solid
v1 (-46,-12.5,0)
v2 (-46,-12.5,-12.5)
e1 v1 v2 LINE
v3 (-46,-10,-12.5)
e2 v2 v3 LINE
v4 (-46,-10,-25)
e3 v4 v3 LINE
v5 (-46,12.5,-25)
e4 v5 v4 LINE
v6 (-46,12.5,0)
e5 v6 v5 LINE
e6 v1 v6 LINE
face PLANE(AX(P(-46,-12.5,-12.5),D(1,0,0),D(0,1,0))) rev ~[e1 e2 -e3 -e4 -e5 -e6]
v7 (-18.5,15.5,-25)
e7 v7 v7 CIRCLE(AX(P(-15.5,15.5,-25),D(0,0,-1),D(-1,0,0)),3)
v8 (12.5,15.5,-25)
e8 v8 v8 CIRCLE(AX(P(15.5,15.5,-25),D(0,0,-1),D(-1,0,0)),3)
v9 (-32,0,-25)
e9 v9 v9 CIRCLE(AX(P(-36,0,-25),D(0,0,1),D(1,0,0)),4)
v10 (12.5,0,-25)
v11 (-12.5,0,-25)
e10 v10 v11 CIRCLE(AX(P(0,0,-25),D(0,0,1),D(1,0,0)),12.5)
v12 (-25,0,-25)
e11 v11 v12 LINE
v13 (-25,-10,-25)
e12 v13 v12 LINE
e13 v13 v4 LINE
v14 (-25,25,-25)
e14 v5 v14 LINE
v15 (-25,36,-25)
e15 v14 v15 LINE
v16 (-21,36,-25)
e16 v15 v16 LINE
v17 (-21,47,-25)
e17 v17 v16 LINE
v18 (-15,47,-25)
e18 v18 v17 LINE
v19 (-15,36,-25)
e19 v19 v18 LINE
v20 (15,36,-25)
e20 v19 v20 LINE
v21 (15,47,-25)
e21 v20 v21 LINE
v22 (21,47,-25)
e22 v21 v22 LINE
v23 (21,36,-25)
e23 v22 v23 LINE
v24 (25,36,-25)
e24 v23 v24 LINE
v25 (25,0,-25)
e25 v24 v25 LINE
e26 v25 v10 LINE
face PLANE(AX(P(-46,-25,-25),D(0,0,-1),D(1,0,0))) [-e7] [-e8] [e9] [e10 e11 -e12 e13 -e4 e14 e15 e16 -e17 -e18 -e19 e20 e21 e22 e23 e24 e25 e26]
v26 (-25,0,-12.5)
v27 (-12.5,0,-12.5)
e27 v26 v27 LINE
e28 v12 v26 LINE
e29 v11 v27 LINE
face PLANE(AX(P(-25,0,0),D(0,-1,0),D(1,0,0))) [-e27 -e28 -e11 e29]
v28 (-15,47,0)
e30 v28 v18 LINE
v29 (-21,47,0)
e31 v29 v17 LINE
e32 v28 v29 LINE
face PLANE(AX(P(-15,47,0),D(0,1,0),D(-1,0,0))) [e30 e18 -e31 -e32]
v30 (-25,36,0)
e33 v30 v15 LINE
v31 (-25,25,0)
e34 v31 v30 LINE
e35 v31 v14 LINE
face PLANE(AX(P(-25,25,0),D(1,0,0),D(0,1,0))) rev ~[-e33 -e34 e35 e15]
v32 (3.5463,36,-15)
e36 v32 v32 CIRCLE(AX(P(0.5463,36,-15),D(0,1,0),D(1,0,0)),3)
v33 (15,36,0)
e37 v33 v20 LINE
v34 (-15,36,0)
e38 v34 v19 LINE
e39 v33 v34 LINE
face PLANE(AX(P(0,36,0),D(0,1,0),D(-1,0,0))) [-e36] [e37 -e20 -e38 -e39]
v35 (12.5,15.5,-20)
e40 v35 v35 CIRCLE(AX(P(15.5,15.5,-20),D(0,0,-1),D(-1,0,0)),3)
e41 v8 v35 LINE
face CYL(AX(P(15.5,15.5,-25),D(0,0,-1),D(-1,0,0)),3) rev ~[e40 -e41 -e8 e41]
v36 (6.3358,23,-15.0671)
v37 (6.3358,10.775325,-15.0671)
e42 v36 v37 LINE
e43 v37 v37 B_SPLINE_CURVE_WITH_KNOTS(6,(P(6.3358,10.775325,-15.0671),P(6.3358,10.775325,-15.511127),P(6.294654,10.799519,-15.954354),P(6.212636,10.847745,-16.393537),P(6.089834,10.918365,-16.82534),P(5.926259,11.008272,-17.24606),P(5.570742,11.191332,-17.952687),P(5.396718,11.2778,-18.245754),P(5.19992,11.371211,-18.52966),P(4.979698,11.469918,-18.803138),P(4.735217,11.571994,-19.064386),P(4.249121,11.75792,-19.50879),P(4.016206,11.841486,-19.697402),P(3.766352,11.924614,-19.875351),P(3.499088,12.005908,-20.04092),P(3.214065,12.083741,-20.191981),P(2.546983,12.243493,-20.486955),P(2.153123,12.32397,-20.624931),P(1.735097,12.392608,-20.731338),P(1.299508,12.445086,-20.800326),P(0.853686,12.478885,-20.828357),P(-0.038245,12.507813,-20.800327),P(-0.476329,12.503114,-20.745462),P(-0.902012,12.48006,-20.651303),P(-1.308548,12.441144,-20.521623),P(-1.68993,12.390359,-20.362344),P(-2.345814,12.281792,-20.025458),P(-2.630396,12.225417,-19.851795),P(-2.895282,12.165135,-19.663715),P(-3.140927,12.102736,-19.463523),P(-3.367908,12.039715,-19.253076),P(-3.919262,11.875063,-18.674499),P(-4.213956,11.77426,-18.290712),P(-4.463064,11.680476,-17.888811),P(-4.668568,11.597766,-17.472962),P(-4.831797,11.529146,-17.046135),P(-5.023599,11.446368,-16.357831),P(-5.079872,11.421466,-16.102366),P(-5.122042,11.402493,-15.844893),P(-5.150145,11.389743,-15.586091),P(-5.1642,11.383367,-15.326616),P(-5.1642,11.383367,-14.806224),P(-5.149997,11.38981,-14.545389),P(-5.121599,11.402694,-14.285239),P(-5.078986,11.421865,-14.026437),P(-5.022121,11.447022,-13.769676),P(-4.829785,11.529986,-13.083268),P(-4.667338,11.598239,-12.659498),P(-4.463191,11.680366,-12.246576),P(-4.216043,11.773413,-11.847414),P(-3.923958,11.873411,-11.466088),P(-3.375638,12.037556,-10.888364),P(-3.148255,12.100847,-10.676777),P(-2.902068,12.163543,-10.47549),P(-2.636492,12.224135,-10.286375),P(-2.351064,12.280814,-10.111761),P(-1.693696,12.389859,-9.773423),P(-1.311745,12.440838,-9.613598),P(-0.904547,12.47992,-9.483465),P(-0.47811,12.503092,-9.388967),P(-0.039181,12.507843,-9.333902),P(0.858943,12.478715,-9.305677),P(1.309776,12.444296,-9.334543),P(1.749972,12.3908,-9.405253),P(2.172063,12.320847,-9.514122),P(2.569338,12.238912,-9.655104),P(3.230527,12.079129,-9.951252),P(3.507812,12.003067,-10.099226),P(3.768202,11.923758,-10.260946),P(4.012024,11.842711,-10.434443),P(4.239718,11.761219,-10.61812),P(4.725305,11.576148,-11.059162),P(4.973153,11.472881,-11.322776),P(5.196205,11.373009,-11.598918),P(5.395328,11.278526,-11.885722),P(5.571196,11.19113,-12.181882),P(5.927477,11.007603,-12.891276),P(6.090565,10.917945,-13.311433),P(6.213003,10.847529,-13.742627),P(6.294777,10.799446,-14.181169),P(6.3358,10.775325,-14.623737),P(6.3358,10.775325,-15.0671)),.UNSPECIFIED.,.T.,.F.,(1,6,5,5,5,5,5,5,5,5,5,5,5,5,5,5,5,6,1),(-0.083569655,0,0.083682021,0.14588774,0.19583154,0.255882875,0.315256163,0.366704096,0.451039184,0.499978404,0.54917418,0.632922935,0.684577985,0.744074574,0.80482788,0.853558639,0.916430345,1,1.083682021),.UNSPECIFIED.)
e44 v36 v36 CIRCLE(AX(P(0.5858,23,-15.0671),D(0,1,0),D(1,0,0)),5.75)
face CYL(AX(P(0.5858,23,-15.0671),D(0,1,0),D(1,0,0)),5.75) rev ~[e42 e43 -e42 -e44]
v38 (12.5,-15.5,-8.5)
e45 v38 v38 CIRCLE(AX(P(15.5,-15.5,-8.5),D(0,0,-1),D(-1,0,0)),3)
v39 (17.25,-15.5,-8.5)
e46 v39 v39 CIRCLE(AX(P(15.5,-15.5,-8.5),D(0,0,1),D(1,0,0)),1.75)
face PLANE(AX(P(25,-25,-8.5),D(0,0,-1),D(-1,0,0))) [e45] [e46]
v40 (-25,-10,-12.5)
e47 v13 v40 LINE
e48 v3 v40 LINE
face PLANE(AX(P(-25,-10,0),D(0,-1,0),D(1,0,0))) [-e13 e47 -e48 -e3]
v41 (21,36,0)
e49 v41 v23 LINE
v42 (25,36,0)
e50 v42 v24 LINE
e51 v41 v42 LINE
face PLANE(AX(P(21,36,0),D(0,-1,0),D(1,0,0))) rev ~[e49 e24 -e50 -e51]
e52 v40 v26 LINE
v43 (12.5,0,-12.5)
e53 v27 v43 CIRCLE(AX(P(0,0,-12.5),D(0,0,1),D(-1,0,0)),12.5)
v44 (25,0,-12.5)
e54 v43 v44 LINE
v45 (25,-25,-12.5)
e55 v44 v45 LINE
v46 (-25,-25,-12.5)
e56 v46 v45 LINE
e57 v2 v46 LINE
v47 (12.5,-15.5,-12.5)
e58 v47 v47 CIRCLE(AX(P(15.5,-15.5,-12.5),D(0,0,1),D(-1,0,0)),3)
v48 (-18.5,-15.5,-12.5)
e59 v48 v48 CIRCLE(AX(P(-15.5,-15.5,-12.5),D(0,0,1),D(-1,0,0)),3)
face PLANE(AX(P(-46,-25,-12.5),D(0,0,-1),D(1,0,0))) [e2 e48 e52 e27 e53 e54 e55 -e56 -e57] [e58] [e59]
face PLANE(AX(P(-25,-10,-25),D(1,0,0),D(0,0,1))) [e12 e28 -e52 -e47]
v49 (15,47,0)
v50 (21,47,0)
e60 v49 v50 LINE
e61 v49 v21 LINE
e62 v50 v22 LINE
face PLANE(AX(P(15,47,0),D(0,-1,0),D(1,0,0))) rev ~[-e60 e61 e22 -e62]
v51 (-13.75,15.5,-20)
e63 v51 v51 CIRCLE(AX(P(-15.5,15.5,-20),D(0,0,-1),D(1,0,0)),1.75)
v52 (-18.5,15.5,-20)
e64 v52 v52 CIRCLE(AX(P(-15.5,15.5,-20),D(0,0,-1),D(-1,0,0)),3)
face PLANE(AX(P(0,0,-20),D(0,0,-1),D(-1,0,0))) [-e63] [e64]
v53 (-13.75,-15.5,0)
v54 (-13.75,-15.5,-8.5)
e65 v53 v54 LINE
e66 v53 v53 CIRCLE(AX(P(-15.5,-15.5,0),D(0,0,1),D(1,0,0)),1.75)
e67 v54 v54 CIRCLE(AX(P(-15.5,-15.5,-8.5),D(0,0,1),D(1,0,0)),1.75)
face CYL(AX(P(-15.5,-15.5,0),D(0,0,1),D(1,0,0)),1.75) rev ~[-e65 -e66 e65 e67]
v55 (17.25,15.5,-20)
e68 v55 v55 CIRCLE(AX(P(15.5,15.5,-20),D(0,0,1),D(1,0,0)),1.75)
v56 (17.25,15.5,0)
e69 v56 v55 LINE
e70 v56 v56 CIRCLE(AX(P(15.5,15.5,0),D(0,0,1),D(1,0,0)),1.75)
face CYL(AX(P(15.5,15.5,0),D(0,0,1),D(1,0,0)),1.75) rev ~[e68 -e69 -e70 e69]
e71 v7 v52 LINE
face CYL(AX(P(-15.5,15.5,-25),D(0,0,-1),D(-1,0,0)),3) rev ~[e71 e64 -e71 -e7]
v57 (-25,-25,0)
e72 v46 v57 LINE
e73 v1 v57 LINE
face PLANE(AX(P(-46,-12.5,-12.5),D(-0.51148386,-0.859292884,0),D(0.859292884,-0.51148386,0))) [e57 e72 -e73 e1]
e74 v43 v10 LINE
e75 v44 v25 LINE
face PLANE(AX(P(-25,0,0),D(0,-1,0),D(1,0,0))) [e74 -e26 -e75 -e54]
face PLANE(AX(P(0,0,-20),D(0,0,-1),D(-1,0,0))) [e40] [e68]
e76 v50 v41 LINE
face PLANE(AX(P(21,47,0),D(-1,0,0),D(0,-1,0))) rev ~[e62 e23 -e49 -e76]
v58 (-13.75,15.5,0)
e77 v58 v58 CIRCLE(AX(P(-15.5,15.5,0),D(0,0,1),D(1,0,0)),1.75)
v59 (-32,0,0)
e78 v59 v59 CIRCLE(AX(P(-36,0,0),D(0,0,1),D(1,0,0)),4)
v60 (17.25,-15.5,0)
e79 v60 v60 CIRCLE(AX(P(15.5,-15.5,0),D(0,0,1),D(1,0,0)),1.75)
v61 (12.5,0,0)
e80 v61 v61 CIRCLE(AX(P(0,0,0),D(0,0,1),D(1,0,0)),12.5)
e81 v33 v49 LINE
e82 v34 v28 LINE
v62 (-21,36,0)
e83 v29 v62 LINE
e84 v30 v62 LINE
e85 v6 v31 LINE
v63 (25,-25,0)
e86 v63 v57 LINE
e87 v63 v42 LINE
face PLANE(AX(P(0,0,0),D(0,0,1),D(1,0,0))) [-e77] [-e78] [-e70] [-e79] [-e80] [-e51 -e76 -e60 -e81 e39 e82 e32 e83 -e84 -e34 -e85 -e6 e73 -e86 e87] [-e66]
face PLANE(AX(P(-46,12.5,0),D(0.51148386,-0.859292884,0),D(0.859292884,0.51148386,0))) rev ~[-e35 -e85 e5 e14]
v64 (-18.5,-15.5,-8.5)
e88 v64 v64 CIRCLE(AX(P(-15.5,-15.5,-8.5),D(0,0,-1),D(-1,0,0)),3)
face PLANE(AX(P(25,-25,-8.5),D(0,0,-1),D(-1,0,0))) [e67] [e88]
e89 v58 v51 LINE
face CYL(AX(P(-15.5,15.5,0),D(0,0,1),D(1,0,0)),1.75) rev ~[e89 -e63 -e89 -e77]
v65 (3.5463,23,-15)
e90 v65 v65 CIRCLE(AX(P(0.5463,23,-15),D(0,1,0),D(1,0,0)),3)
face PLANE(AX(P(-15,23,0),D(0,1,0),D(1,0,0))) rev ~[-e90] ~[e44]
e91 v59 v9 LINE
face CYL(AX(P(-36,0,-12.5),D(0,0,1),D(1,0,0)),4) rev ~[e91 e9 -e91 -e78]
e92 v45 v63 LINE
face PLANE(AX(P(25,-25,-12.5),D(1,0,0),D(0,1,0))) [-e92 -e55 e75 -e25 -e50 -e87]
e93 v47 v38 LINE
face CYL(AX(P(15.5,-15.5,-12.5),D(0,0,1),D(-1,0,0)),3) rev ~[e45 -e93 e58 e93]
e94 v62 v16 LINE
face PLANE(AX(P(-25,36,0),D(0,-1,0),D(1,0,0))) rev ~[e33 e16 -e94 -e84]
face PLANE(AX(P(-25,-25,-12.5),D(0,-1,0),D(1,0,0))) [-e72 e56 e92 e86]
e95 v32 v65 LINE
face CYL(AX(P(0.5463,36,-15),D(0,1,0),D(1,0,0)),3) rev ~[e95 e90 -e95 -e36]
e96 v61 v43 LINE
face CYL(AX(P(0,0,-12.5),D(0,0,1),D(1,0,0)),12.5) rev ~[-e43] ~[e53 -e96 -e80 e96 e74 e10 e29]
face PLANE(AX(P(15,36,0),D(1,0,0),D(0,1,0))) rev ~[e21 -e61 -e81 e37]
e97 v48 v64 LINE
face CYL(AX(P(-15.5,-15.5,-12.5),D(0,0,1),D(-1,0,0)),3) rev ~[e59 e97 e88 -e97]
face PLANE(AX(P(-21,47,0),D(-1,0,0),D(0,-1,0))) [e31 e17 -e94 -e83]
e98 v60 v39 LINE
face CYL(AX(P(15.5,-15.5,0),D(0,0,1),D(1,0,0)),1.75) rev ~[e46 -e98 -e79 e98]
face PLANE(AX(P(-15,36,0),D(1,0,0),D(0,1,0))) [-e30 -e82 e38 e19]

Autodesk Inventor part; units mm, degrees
ref_plane "YZ Plane" through (0, 0, 0) normal (1, 0, 0) x (0, 1, 0)
ref_plane "XZ Plane" through (0, 0, 0) normal (0, 1, 0) x (-1, 0, 0)
ref_plane "XY Plane" through (0, 0, 0) normal (0, 0, 1) x (1, 0, 0)
sketch "Sketch1" plane through (0, 0, 0) normal (0, 0, 1) x (1, 0, 0)
  point P0 (0, 0)
sketch "Sketch2" plane through (0, 0, 0) normal (0, 0, 1) x (1, 0, 0)
  line L0 (-25, -25) -> (25, -25)
  line L1 (25, -25) -> (25, 25)
  circle A0 centre (0, 0) radius 12.5
  circle A1 centre (-15.5, 15.5) radius 1.75
  line L2 (25, 25) -> (25, 19)
  line L3 (25, -25) -> (19, -25)
  line L4 (-25, -25) -> (-19, -25)
  circle A2 centre (-15.5, -15.5) radius 1.75
  circle A3 centre (15.5, -15.5) radius 1.75
  circle A4 centre (15.5, 15.5) radius 1.75
  line L5 (-25, 25) -> (-25, 36)
  line L6 (25, 36) -> (25, 25)
  line L7 (0, 36) -> (15, 36)
  line L8 (15, 36) -> (15, 47)
  line L9 (15, 47) -> (21, 47)
  line L10 (21, 47) -> (21, 36)
  line L11 (0, 36) -> (-15, 36)
  line L12 (-15, 36) -> (-15, 47)
  line L13 (-15, 47) -> (-21, 47)
  line L14 (-21, 47) -> (-21, 36)
  circle A5 centre (-36, 0) radius 4
  line L15 (-46, 0) -> (-46, 12.5)
  line L16 (-46, 12.5) -> (-25, 25)
  line L17 (-46, 0) -> (-46, -12.5)
  line L18 (-46, -12.5) -> (-25, -25)
  line L19 (-25, 36) -> (-21, 36)
  line L20 (-15, 36) -> (15, 36)
  line L21 (21, 36) -> (25, 36)
  line L22 (-21, -21) -> (21, -21)
  line L23 (21, -21) -> (21, 21)
  line L24 (21, 21) -> (-21, 21)
  line L25 (-21, 21) -> (-21, -21)
  line L26 (-21, -21) -> (21, 21) construction
  line L27 (21, -21) -> (-21, 21) construction
  dimension "d1" = 50
  dimension "d2" = 25
  dimension "d14" = 3.5
  dimension "d15" = 11
  dimension "d18" = 11
  dimension "d69" = 42
  dimension "d70" = 42
  dimension "d71" = 5.5
  dimension "d72" = 5.5
  dimension "d73" = 5.5
  dimension "d74" = 5.5
  dimension "d75" = 5.5
  dimension "d76" = 5.5
  dimension "d77" = 5.5
  dimension "d78" = 5.5
  dimension "d79" = 8
  dimension "d87" = 36
  dimension "d88" = 46
  dimension "d89" = 25
  dimension "d90" = 50
  dimension "d91" = 50
  dimension "d92" = 15
  dimension "d93" = 6
  dimension "d94" = 4
extrude "Extrusion1" add sketch "Sketch2" against normal blind 25 contours L18 L17 L15 L16 L5 L19 L14 L13 L12 L11 L7 L8 L9 L10 L21 L6 L1 L0 | L25 L24 L23 L22
sketch "Sketch3" plane through (0, 0, 0) normal (0, 1, 0) x (-1, 0, 0)
  point P0 (0, 0)
sketch "Sketch4" plane through (-25, -25, 0) normal (0, -1, 0) x (1, 0, 0)
  point P0 (25, 0)
sketch "Sketch6" plane through (-25, -25, 0) normal (0, -1, 0) x (1, 0, 0)
  line L0 (50, -25) -> (-21, -25)
  line L1 (-21, -25) -> (-21, -12.5)
  line L2 (-21, -12.5) -> (50, -12.5)
  line L3 (50, -12.5) -> (50, -25)
  point P0 (25, 0)
  dimension "d34" = 71
  dimension "d35" = 12.5
extrude "Extrusion2" cut sketch "Sketch6" against normal blind 25
sketch "Sketch7" plane through (25, -25, -12.5) normal (0, 0, -1) x (-1, 0, 0)
  circle A0 centre (40.5, 9.5) radius 1.75 projected
  circle A1 centre (40.5, 9.5) radius 3
  point P0 (25, 25)
  dimension "d38" = 6
extrude "Extrusion3" cut sketch "Sketch7" against normal blind 4 contours A0 | A1
sketch "Sketch8" plane through (25, -25, -12.5) normal (0, 0, -1) x (-1, 0, 0)
  circle A0 centre (9.5, 9.5) radius 1.75 projected
  circle A1 centre (9.5, 9.5) radius 3
  point P0 (25, 25)
  dimension "d44" = 6
extrude "Extrusion4" cut sketch "Sketch8" against normal blind 4 contours A0 | A1
sketch "Sketch9" plane through (0, 0, -25) normal (0, 0, -1) x (-1, 0, 0)
  circle A0 centre (15.5, 15.5) radius 1.75 projected
  circle A1 centre (15.5, 15.5) radius 3
  circle A2 centre (-15.5, 15.5) radius 1.75 projected
  circle A3 centre (-15.5, 15.5) radius 3
  point P0 (0, 0)
  dimension "d47" = 6
  dimension "d48" = 6
extrude "Extrusion5" cut sketch "Sketch9" against normal blind 5 contours A1
sketch "Sketch10" plane through (0, 0, -25) normal (0, 0, -1) x (-1, 0, 0)
  circle A0 centre (-15.5, 15.5) radius 1.75 projected
  circle A1 centre (-15.5, 15.5) radius 3
  point P0 (0, 0)
  dimension "d51" = 6
extrude "Extrusion6" cut sketch "Sketch10" against normal blind 5 contours A0 | A1
move faces "Move1" translate (0, 0, -12.5) faces at (-4.8121, -22.7683, -12.5)
sketch "Sketch11" plane through (-25, -25, 0) normal (0, -1, 0) x (1, 0, 0)
  line L0 (0, -25) -> (50, -25) projected
  line L1 (50, -25) -> (-21, -25)
  line L2 (-21, -25) -> (-21, -12.5)
  line L3 (-21, -12.5) -> (50, -12.5)
  line L4 (50, -12.5) -> (50, -25)
  point P0 (25, 0)
  dimension "d60" = 71
  dimension "d61" = 12.5
extrude "Extrusion7" cut sketch "Sketch11" against normal blind 15
sketch "Sketch12" plane through (-25, -10, 0) normal (0, -1, 0) x (1, 0, 0)
  line L0 (50, -12.5) -> (50, -25) projected
  line L1 (50, -25) -> (0, -25)
  line L2 (0, -25) -> (0, -12.5)
  line L3 (0, -12.5) -> (50, -12.5)
  line L4 (50, -12.5) -> (50, -25)
  point P0 (25, 0)
  dimension "d64" = 50
  dimension "d65" = 12.5
extrude "Extrusion8" cut sketch "Sketch12" against normal blind 10
sketch "Sketch13" plane through (-15, 36, 0) normal (0, 1, 0) x (1, 0, 0)
  point P0 (15, 0)
sketch "Sketch14" plane through (-15, 36, 0) normal (0, 1, 0) x (1, 0, 0)
  circle A0 centre (15.5463, 15) radius 3
  point P0 (15, 0)
  dimension "d80" = 6
extrude "Extrusion9" cut sketch "Sketch14" against normal blind 25
ref_plane "Work Plane6" through (-15, 23, 0) normal (0, 1, 0) x (1, 0, 0)
sketch "Sketch15" plane through (-15, 23, 0) normal (0, 1, 0) x (1, 0, 0)
  circle A0 centre (15.5858, 15.0671) radius 5.75
  point P0 (15, 0)
  dimension "d84" = 11.5
extrude "Extrusion10" cut sketch "Sketch15" against normal blind 25
properties part number "SuporteMotor"
